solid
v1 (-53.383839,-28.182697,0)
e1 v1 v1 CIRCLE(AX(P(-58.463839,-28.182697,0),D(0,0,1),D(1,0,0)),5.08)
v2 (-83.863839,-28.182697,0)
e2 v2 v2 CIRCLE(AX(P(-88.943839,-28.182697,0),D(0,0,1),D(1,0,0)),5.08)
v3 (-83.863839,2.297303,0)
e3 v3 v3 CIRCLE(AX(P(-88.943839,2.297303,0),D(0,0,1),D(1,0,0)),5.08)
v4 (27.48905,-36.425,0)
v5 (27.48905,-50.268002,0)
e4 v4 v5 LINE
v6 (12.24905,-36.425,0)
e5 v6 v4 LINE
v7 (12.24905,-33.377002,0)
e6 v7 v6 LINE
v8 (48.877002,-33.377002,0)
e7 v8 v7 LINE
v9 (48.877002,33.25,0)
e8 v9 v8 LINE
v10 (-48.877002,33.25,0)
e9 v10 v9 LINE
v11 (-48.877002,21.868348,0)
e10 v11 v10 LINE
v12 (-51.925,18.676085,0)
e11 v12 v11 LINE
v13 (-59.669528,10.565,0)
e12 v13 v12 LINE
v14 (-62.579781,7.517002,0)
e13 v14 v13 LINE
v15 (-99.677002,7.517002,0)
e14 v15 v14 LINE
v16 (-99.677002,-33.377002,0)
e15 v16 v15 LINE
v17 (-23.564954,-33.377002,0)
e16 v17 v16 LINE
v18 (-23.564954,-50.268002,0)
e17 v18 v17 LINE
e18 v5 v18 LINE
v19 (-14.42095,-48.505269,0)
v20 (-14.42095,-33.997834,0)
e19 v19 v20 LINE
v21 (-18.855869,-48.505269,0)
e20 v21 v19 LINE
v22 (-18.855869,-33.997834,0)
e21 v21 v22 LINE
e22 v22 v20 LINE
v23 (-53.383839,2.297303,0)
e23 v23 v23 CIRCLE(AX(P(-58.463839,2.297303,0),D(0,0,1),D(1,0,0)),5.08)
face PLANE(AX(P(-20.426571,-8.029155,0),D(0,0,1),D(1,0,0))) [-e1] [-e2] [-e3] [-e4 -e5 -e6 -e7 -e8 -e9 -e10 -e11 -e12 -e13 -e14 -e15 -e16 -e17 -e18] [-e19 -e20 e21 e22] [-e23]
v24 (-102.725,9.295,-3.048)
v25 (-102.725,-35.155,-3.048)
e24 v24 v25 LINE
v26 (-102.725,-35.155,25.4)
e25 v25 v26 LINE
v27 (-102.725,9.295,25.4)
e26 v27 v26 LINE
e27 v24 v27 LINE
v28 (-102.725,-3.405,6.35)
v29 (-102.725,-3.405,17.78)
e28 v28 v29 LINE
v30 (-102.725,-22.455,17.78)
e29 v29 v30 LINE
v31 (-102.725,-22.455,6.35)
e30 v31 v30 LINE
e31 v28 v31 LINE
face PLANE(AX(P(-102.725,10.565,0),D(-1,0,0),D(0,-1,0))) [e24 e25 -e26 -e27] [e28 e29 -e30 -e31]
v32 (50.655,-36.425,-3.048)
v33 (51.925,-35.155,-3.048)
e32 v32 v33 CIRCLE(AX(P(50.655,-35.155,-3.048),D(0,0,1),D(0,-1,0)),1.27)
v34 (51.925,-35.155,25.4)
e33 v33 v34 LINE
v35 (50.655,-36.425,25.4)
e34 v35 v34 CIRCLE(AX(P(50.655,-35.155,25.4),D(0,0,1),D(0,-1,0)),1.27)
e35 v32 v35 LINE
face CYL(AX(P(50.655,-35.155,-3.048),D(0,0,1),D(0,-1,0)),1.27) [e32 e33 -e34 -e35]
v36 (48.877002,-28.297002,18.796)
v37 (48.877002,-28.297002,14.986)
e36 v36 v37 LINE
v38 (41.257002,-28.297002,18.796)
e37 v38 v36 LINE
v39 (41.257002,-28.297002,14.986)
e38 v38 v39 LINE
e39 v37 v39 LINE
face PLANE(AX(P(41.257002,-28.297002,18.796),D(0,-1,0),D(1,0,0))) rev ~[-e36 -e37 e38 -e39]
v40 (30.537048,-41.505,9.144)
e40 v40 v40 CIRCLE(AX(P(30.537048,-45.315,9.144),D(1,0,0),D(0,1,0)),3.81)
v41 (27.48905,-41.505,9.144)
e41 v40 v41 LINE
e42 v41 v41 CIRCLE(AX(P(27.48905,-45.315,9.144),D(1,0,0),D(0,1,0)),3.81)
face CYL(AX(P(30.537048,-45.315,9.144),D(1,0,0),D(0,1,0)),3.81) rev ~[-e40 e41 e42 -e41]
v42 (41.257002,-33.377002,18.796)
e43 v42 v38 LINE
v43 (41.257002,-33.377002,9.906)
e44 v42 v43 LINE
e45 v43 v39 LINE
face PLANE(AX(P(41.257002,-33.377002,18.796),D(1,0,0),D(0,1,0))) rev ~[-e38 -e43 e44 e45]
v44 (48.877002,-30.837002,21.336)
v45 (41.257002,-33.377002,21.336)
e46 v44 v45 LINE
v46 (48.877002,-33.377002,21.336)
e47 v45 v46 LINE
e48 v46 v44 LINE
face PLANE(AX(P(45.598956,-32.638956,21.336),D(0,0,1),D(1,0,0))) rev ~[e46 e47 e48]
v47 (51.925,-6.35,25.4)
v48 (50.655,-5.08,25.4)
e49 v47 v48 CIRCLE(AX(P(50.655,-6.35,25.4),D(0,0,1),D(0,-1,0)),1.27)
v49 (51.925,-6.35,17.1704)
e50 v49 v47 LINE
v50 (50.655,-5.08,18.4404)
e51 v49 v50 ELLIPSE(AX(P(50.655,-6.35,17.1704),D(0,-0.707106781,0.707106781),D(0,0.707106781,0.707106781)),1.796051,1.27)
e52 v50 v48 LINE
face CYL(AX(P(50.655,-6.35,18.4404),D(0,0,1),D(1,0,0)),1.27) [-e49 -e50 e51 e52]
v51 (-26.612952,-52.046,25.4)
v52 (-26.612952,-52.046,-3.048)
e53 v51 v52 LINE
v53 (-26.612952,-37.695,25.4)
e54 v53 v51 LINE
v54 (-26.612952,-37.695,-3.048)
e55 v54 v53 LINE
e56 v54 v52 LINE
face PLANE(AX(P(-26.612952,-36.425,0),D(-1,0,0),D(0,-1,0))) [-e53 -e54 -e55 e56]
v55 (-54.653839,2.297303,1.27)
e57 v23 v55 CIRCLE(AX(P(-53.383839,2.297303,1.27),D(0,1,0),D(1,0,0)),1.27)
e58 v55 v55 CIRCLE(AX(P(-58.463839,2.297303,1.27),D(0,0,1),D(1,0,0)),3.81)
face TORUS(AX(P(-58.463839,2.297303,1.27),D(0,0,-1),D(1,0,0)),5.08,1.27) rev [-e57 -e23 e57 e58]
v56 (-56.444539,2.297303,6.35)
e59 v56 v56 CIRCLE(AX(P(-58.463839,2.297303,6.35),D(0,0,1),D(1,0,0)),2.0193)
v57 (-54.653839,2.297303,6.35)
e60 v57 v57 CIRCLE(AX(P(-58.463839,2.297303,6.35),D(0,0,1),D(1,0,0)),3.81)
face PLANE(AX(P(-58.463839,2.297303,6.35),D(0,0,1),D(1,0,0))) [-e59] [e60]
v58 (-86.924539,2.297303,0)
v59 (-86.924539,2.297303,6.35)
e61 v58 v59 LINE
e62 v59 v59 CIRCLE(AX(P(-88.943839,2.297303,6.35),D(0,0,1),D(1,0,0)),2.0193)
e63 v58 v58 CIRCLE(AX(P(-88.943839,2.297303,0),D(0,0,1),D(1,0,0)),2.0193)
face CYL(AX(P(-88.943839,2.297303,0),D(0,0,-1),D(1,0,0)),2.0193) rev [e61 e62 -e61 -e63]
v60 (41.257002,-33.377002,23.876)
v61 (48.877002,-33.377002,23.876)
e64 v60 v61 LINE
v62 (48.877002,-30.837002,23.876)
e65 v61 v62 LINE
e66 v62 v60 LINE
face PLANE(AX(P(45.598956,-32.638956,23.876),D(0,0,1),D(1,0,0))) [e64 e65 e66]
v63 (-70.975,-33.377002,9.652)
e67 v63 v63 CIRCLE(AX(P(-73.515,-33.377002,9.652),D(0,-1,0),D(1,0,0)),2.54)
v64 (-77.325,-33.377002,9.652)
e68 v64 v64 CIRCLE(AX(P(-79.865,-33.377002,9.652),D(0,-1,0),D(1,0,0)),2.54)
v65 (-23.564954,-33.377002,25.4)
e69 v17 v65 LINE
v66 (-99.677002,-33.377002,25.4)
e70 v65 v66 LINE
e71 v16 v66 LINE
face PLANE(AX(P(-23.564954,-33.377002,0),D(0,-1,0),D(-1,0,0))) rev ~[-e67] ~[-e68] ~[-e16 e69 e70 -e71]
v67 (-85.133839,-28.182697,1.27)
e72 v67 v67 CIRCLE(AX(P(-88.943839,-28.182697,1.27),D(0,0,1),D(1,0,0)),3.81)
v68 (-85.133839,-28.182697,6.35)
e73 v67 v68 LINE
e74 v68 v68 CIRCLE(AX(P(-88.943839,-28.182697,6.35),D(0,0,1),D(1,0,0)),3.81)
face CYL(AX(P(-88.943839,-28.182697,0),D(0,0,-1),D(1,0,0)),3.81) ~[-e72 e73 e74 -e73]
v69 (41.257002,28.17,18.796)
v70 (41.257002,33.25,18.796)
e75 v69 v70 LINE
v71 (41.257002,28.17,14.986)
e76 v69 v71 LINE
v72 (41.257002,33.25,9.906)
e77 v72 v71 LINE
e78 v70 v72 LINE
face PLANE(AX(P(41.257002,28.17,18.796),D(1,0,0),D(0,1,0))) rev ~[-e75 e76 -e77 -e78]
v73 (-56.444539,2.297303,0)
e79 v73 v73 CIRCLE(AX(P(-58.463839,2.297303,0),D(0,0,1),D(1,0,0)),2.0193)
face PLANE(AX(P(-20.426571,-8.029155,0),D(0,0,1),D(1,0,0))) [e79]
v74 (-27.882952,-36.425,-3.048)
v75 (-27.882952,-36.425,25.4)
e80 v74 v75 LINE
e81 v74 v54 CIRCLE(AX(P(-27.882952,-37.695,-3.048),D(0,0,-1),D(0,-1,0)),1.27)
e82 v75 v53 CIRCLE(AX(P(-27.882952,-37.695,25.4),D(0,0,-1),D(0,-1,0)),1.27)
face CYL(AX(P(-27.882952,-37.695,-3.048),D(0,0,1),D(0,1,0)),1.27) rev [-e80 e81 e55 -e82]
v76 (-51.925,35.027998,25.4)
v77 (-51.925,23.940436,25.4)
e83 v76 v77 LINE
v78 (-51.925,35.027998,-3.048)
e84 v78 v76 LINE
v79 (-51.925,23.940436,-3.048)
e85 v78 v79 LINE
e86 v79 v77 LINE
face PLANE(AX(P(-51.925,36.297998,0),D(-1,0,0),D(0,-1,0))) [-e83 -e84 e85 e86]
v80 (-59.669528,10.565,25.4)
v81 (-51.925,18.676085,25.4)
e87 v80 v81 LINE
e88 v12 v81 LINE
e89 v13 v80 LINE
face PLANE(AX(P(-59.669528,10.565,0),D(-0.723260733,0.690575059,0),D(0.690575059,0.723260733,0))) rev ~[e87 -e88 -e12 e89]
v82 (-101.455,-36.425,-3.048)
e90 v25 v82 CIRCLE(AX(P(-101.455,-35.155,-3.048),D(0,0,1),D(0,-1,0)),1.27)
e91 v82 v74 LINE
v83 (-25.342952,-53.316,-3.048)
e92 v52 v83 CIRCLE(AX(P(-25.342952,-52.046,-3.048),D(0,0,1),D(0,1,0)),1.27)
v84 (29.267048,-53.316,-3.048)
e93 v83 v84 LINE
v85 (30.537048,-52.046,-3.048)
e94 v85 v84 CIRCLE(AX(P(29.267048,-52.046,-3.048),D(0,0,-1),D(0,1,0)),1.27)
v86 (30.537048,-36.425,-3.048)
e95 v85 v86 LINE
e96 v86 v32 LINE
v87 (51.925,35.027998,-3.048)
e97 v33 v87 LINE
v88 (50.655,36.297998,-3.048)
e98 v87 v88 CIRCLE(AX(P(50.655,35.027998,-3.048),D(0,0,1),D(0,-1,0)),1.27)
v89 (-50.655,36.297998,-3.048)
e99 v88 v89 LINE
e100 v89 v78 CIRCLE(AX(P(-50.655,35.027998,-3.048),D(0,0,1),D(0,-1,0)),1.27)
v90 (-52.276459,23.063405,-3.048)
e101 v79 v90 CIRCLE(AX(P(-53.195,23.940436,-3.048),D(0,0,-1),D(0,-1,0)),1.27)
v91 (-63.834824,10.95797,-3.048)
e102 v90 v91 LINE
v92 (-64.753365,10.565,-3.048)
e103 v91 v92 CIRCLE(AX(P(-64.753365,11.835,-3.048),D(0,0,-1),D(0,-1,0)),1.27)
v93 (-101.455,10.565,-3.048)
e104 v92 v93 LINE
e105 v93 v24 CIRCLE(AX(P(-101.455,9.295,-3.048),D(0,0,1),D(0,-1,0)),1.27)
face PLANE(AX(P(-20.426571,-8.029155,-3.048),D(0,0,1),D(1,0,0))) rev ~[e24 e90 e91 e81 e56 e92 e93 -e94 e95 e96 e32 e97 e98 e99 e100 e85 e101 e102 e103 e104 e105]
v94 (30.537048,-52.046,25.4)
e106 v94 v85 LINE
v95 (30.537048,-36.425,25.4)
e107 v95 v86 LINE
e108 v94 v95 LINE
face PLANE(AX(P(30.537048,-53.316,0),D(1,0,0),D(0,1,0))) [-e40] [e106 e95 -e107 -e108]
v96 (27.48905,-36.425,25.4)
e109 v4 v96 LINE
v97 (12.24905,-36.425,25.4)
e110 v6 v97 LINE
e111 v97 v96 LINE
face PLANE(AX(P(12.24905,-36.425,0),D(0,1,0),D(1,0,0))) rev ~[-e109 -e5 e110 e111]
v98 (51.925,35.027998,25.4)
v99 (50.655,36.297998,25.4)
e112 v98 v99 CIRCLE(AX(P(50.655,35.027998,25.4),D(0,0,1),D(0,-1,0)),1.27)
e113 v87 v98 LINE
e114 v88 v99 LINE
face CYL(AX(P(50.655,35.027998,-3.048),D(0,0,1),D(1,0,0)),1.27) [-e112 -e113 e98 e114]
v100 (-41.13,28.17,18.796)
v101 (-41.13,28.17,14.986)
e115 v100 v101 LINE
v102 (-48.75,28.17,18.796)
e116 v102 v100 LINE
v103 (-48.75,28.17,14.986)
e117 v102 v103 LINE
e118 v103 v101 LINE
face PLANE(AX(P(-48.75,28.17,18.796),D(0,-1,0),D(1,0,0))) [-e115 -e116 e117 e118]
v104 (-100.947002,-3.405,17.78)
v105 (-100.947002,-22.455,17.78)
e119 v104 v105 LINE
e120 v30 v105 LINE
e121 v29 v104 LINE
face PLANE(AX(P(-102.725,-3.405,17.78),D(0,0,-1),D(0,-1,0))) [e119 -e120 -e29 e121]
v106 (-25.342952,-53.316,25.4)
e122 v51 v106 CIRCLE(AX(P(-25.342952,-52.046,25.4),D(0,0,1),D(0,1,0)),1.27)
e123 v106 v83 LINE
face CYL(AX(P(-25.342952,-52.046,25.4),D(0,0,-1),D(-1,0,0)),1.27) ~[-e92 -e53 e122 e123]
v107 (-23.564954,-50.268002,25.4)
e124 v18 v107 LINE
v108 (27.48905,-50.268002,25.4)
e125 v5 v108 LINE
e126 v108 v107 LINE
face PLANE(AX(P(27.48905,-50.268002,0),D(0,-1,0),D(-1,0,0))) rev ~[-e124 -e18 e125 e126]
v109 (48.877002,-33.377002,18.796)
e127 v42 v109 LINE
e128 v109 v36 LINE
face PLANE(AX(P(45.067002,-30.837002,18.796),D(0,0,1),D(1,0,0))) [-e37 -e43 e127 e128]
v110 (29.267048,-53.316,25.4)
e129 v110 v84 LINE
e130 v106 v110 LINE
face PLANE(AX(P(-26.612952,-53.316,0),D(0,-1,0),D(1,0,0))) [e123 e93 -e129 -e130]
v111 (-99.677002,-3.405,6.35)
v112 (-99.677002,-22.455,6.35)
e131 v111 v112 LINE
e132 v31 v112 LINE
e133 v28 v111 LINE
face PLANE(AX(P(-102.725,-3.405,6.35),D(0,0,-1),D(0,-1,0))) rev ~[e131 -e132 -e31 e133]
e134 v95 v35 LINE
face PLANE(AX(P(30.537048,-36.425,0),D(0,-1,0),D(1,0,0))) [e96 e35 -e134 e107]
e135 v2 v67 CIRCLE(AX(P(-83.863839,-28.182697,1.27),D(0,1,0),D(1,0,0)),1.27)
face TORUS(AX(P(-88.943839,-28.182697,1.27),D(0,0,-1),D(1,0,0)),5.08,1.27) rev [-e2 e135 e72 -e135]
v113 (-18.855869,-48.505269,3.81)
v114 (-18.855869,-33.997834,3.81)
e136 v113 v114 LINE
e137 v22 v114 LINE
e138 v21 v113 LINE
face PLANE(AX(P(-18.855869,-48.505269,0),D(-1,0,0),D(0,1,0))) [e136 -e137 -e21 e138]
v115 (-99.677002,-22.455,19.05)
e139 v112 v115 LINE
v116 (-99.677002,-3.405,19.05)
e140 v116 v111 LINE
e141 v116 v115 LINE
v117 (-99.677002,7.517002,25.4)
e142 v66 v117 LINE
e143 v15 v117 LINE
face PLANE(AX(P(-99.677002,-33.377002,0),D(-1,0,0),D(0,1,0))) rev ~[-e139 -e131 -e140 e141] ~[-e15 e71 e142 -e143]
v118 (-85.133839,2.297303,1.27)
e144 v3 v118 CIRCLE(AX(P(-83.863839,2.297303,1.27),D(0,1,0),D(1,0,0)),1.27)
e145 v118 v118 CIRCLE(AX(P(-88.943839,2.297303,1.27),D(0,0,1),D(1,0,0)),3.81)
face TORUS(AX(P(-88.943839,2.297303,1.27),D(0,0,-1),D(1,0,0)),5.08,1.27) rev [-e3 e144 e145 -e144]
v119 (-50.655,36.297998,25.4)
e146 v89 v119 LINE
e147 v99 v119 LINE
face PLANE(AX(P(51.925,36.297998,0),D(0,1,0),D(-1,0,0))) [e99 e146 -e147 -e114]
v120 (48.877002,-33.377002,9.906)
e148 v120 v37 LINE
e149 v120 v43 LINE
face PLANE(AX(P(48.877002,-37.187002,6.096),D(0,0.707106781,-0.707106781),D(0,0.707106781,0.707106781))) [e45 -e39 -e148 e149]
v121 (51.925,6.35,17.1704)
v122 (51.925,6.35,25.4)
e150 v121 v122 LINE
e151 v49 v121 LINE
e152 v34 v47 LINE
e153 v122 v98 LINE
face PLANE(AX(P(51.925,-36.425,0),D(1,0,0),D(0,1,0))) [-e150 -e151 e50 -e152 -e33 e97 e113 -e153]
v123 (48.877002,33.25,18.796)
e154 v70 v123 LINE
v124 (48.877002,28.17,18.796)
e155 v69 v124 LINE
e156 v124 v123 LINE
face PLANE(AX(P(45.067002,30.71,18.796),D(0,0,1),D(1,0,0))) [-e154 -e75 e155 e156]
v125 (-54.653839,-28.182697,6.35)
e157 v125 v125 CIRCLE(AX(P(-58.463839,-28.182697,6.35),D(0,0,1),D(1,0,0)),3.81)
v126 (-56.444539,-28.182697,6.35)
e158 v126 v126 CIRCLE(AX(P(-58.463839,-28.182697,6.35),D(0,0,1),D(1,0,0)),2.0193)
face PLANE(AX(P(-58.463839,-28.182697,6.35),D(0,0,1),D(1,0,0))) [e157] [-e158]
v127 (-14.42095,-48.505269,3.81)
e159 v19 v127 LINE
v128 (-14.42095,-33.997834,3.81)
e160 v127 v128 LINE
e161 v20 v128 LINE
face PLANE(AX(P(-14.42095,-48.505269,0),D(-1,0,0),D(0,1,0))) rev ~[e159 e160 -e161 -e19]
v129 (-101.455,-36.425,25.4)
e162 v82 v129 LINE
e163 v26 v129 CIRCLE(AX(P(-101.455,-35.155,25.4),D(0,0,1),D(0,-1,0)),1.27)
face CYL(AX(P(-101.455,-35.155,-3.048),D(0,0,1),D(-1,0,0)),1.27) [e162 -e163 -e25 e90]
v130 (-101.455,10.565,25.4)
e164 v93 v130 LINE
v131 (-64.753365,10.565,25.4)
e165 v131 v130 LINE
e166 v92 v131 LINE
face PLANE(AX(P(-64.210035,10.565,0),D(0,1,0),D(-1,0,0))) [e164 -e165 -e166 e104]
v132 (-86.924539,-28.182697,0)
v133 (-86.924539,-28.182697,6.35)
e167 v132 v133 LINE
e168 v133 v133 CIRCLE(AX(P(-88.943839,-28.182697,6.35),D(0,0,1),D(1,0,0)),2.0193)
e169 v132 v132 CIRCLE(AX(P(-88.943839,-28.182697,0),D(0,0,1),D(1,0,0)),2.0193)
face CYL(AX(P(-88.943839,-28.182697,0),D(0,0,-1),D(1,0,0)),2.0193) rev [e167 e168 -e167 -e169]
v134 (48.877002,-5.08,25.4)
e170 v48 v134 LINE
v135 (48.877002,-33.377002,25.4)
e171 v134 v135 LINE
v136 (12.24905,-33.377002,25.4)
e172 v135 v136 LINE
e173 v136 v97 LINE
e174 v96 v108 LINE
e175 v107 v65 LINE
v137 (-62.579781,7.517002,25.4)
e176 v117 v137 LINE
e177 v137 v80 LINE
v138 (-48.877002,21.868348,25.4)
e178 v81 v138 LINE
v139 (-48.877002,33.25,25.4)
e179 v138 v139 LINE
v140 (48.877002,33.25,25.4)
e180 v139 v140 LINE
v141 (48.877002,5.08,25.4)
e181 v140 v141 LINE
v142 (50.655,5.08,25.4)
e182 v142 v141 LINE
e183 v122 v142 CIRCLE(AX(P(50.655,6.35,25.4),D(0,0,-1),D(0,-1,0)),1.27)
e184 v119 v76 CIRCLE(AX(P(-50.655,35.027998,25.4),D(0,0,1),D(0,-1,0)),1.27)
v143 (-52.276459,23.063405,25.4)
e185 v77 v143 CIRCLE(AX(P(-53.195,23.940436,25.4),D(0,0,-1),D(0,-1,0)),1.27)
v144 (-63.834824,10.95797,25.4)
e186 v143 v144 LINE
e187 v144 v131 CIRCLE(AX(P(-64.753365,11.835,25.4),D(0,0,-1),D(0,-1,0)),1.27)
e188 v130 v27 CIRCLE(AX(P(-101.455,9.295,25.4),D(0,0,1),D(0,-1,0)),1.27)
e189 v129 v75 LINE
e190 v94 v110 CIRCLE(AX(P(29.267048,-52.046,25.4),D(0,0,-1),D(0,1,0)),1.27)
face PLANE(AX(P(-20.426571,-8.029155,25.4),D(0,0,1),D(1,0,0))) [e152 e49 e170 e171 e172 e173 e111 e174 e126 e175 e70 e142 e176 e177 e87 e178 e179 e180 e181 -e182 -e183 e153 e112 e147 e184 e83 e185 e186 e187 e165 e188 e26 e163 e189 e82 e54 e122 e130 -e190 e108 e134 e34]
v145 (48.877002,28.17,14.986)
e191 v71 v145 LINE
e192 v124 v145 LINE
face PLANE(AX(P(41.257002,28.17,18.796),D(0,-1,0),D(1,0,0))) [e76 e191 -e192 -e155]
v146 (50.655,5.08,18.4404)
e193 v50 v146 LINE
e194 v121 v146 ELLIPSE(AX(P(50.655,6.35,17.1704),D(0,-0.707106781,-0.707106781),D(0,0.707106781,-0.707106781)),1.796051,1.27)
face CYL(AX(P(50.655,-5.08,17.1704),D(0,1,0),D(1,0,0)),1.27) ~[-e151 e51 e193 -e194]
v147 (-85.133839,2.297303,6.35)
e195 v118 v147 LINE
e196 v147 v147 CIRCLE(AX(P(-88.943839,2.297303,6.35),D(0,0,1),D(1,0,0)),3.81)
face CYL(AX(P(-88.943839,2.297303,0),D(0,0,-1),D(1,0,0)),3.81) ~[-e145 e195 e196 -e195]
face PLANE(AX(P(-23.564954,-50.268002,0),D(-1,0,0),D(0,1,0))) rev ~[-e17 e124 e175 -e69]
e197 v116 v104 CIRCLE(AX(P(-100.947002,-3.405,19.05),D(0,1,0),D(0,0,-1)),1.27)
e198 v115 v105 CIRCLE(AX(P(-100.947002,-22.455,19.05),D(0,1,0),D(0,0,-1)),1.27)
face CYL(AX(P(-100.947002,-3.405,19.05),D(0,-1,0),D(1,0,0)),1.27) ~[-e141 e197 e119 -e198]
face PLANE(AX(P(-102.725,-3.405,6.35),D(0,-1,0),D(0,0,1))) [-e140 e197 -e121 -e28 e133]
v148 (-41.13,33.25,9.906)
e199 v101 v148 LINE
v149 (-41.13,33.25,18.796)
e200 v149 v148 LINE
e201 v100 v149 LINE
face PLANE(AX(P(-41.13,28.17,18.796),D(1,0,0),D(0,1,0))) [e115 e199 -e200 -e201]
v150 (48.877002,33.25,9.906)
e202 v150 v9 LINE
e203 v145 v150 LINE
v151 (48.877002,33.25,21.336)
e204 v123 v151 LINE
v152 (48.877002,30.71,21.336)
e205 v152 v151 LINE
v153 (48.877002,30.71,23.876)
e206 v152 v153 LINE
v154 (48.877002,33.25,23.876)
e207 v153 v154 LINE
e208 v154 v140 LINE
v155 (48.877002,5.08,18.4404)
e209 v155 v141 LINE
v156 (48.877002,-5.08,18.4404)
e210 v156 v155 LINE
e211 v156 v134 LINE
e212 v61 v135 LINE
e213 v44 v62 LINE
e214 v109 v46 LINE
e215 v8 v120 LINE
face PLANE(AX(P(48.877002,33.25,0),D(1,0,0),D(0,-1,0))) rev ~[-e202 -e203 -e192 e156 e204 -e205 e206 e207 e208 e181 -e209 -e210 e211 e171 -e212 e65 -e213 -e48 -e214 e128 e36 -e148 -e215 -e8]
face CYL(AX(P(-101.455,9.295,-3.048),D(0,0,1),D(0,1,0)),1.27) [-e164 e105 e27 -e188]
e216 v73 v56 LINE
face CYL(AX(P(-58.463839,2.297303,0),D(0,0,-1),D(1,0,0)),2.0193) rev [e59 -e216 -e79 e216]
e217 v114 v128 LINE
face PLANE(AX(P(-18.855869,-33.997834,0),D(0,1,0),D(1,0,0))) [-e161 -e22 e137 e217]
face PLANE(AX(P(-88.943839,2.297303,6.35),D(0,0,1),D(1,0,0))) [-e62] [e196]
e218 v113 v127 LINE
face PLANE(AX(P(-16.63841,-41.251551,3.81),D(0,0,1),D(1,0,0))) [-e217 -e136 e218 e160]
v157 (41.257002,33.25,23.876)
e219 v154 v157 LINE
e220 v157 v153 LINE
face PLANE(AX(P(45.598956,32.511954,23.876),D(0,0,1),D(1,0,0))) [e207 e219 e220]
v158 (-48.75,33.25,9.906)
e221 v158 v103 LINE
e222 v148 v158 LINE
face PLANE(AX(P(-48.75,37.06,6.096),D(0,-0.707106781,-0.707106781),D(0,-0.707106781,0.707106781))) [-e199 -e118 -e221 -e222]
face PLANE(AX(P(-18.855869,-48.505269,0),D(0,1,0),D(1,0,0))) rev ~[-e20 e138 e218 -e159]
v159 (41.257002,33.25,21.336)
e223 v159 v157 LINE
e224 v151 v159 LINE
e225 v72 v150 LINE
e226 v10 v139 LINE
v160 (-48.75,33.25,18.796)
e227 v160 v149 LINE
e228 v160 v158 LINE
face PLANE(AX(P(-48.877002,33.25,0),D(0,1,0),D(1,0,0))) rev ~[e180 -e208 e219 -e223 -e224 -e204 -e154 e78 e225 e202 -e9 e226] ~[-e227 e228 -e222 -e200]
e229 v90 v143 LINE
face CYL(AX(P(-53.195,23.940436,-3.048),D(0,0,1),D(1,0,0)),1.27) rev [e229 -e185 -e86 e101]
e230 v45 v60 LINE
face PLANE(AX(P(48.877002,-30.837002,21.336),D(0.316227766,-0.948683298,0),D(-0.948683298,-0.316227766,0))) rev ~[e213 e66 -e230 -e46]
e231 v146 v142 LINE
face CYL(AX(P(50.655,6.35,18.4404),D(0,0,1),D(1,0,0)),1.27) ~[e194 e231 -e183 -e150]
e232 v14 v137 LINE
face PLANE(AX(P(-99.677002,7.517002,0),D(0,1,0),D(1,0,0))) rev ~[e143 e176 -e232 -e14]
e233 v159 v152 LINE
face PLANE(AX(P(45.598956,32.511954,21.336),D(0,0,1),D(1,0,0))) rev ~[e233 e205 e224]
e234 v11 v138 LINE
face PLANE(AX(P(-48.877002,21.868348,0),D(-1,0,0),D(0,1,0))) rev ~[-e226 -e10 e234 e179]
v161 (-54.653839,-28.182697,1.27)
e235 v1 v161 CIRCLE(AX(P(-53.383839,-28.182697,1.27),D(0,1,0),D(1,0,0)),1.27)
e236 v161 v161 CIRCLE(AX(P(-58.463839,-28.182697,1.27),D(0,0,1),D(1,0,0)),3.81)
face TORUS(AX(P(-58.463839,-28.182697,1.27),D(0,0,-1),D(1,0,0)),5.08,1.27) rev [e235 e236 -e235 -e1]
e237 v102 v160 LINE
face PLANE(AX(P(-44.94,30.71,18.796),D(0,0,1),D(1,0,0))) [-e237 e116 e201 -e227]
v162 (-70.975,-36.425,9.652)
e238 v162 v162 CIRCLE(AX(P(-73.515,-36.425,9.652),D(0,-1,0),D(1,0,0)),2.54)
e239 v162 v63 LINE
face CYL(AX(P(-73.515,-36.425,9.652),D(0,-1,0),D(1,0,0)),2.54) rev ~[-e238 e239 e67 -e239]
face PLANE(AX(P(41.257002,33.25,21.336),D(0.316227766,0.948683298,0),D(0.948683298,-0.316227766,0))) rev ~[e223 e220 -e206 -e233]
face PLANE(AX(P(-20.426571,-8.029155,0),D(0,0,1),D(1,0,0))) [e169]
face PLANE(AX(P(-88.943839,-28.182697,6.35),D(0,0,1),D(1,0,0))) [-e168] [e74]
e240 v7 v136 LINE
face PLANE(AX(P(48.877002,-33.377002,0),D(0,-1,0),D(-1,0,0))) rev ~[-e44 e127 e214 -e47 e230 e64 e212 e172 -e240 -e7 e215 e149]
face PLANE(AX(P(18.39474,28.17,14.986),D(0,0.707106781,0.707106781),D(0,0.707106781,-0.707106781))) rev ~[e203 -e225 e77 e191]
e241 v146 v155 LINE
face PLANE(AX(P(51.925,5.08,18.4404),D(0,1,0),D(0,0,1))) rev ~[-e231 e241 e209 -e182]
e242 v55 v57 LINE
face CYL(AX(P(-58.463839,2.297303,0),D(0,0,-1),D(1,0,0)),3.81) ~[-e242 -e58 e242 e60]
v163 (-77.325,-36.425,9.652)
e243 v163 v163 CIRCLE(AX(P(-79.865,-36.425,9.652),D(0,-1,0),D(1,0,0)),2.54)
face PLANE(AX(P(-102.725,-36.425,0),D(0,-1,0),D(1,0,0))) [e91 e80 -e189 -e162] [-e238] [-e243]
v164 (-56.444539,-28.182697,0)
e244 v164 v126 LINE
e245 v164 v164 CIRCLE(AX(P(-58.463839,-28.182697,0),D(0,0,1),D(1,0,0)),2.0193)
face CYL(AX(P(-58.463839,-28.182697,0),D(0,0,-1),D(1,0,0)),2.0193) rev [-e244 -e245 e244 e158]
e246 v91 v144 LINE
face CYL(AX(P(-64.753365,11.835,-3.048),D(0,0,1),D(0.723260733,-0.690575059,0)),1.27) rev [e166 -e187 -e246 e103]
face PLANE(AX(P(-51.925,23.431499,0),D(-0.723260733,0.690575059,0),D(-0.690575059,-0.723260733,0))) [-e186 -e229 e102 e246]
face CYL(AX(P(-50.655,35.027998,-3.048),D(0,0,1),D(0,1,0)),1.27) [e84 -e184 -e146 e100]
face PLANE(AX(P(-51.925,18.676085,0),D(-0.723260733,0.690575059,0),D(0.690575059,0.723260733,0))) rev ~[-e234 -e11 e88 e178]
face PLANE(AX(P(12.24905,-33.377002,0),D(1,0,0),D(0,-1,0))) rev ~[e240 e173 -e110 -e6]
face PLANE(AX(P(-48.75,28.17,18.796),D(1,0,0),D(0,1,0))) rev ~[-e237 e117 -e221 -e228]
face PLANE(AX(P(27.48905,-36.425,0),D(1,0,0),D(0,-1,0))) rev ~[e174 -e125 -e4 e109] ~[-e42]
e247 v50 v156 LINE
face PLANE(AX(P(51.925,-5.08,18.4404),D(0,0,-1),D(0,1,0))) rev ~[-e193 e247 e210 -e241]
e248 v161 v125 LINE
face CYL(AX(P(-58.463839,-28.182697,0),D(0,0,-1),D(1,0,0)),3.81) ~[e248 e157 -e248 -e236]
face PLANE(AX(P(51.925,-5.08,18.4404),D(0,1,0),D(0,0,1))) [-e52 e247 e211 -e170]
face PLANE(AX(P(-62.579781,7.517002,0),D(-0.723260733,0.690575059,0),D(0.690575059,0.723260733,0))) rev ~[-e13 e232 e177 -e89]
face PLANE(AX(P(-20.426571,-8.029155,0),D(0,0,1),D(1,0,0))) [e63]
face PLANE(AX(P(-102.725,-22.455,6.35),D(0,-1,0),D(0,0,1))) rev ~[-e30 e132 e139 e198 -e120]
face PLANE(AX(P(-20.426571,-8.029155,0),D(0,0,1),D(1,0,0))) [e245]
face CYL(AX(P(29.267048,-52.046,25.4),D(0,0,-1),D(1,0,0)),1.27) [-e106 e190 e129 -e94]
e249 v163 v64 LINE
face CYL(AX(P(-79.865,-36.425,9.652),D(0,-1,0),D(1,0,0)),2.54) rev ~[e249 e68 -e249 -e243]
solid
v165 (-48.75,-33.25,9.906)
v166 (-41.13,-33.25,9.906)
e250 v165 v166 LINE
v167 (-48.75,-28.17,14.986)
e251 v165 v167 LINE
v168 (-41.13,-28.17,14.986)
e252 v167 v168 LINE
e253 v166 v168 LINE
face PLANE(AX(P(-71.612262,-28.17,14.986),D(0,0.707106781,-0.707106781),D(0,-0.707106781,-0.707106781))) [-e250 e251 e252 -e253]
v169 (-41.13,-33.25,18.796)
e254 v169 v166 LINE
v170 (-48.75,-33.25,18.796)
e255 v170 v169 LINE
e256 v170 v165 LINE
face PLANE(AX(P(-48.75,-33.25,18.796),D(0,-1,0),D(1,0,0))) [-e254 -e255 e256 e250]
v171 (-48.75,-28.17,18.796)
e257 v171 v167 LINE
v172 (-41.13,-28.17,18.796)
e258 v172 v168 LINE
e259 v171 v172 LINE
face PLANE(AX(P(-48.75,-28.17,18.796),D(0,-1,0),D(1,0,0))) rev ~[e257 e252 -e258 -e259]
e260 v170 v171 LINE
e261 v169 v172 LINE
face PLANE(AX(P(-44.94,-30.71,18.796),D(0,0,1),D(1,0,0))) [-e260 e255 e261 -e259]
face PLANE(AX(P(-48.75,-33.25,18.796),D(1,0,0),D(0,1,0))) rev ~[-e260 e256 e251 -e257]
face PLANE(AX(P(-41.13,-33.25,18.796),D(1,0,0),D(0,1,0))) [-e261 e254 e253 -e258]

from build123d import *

# Parameters (mm, degrees)
F1_DEPTH       = 25.4
F0_R           = 3.81
F0_W           = 7.62
F0_H           = 5.08
F0_R_2         = 2.0193
F2_DEPTH       = 3.048
F3_DEPTH       = 6.35
F4_R           = 3.81
F5_DEPTH       = 6.35
F6_W           = 4.4349184911
F6_H           = 14.5074356901
F7_DEPTH       = 3.81
F8_W           = 19.05
F8_H           = 11.43
F9_DEPTH       = 5.08
F10_W          = 10.16
F10_H          = 7.112
F11_DEPTH      = 3.175
F13_W          = 7.62
F13_H          = 5.08
F14_DEPTH      = 12.7
F15_T4_DEPTH   = 30.482261763
F15_T9_DEPTH   = 30.482261763
F15_T14_DEPTH  = 30.482261763
F15_2_T1_DEPTH = 53.344523526
F18_DEPTH      = 2.54
F19_R          = 2.54
F20_DEPTH      = 3.048
F21_R          = 1.27


# Not quite as in the source:
# - a fillet or chamfer that OpenCascade refuses, or shapes differently, is made with other operations: its cross-section is extruded or revolved along the edge and cut away or added


with BuildPart() as f1:
    # F0 (on Top) → F1 (new body)
    with BuildSketch(Plane.XY):
        Polygon((30.5370476484, -36.425), (51.925, -36.425), (51.925, 36.2979981456), (-51.925, 36.2979981456), (-51.925, 23.4314990728), (-64.2100349069, 10.565), (-102.725, 10.565), (-102.725, -36.425), (-51.925, -36.425), (-26.6129523516, -36.425), (-26.6129523516, -53.316), (30.5370476484, -53.316), align=None)
        Polygon((-62.5797808525, 7.5170018544), (-59.6695281565, 10.565), (-51.925, 18.6760851618), (-48.8770018544, 21.8683484), (-48.8770018544, 33.25), (-48.75, 33.25), (-41.13, 33.25), (41.2570018544, 33.25), (48.8770018544, 33.25), (48.8770018544, 28.17), (48.8770018544, -28.2970018544), (48.8770018544, -33.3770018544), (41.2570018544, -33.3770018544), (27.4890495028, -33.3770018544), (12.2490495028, -33.3770018544), (12.2490495028, -36.425), (27.4890495028, -36.425), (27.4890495028, -50.2680018544), (-23.564954206, -50.2680018544), (-23.564954206, -33.3770018544), (-51.925, -33.3770018544), (-99.6770018544, -33.3770018544), (-99.6770018544, 7.5170018544), align=None, mode=Mode.SUBTRACT)
    extrude(amount=F1_DEPTH)

    # F0 (on Top) → F2 (join)
    with BuildSketch(Plane.XY):
        Polygon((30.5370476484, -36.425), (51.925, -36.425), (51.925, 36.2979981456), (-51.925, 36.2979981456), (-51.925, 23.4314990728), (-64.2100349069, 10.565), (-102.725, 10.565), (-102.725, -36.425), (-51.925, -36.425), (-26.6129523516, -36.425), (-26.6129523516, -53.316), (30.5370476484, -53.316), align=None)
        Polygon((-62.5797808525, 7.5170018544), (-59.6695281565, 10.565), (-51.925, 18.6760851618), (-48.8770018544, 21.8683484), (-48.8770018544, 33.25), (-48.75, 33.25), (-41.13, 33.25), (41.2570018544, 33.25), (48.8770018544, 33.25), (48.8770018544, 28.17), (48.8770018544, -28.2970018544), (48.8770018544, -33.3770018544), (41.2570018544, -33.3770018544), (27.4890495028, -33.3770018544), (12.2490495028, -33.3770018544), (12.2490495028, -36.425), (27.4890495028, -36.425), (27.4890495028, -50.2680018544), (-23.564954206, -50.2680018544), (-23.564954206, -33.3770018544), (-51.925, -33.3770018544), (-99.6770018544, -33.3770018544), (-99.6770018544, 7.5170018544), align=None, mode=Mode.SUBTRACT)
        Polygon((-51.925, 18.6760851618), (-59.6695281565, 10.565), (-62.5797808525, 7.5170018544), (-99.6770018544, 7.5170018544), (-99.6770018544, -33.3770018544), (-51.925, -33.3770018544), (-23.564954206, -33.3770018544), (-23.564954206, -50.2680018544), (27.4890495028, -50.2680018544), (27.4890495028, -36.425), (12.2490495028, -36.425), (12.2490495028, -33.3770018544), (27.4890495028, -33.3770018544), (41.2570018544, -33.3770018544), (41.2570018544, -28.2970018544), (48.8770018544, -28.2970018544), (48.8770018544, 28.17), (41.2570018544, 28.17), (41.2570018544, 33.25), (-41.13, 33.25), (-41.13, 28.17), (-48.75, 28.17), (-48.75, 33.25), (-48.8770018544, 33.25), (-48.8770018544, 21.8683484), align=None)
        with Locations((-88.9438392901, -28.1826965511)):
            Circle(F0_R, mode=Mode.SUBTRACT)
        with Locations((-58.4638392901, -28.1826965511)):
            Circle(F0_R, mode=Mode.SUBTRACT)
        with Locations((-44.94, -30.71)):
            Rectangle(F0_W, F0_H, mode=Mode.SUBTRACT)
        with Locations((-88.9438392901, 2.2973034489)):
            Circle(F0_R, mode=Mode.SUBTRACT)
        with Locations((-58.4638392901, 2.2973034489)):
            Circle(F0_R, mode=Mode.SUBTRACT)
        with Locations((-58.4638392901, 2.2973034489)):
            Circle(F0_R)
        with Locations((-58.4638392901, 2.2973034489)):
            Circle(F0_R_2, mode=Mode.SUBTRACT)
        with Locations((-88.9438392901, 2.2973034489)):
            Circle(F0_R)
        with Locations((-88.9438392901, 2.2973034489)):
            Circle(F0_R_2, mode=Mode.SUBTRACT)
        with Locations((-58.4638392901, -28.1826965511)):
            Circle(F0_R)
        with Locations((-58.4638392901, -28.1826965511)):
            Circle(F0_R_2, mode=Mode.SUBTRACT)
        with Locations((-88.9438392901, -28.1826965511)):
            Circle(F0_R)
        with Locations((-88.9438392901, -28.1826965511)):
            Circle(F0_R_2, mode=Mode.SUBTRACT)
        with Locations((-44.94, -30.71)):
            Rectangle(F0_W, F0_H)
        with Locations((45.0670018544, -30.8370018544)):
            Rectangle(F0_W, F0_H)
        with Locations((45.0670018544, 30.71)):
            Rectangle(F0_W, F0_H)
        with Locations((-44.94, 30.71)):
            Rectangle(F0_W, F0_H)
        with Locations((-88.9438392901, -28.1826965511)):
            Circle(F0_R_2)
        with Locations((-88.9438392901, 2.2973034489)):
            Circle(F0_R_2)
        with Locations((-58.4638392901, 2.2973034489)):
            Circle(F0_R_2)
        with Locations((-58.4638392901, -28.1826965511)):
            Circle(F0_R_2)
    extrude(amount=-F2_DEPTH)

    # F0 (on Top) → F3 (join)
    with BuildSketch(Plane.XY):
        with Locations((-58.4638392901, 2.2973034489)):
            Circle(F0_R)
        with Locations((-58.4638392901, 2.2973034489)):
            Circle(F0_R_2, mode=Mode.SUBTRACT)
        with Locations((-88.9438392901, 2.2973034489)):
            Circle(F0_R)
        with Locations((-88.9438392901, 2.2973034489)):
            Circle(F0_R_2, mode=Mode.SUBTRACT)
        with Locations((-88.9438392901, -28.1826965511)):
            Circle(F0_R)
        with Locations((-88.9438392901, -28.1826965511)):
            Circle(F0_R_2, mode=Mode.SUBTRACT)
        with Locations((-58.4638392901, -28.1826965511)):
            Circle(F0_R)
        with Locations((-58.4638392901, -28.1826965511)):
            Circle(F0_R_2, mode=Mode.SUBTRACT)
    extrude(amount=F3_DEPTH)

    # F4 (on face) → F5 (cut)
    with BuildSketch(Plane.YZ.offset(30.5370476484)):
        with Locations((-45.315, 9.144)):
            Circle(F4_R)
    extrude(amount=-F5_DEPTH, mode=Mode.SUBTRACT)

    # F6 (on face) → F7 (join)
    with BuildSketch(Plane.XY):
        with Locations((-16.6384097427, -41.2515513599)):
            Rectangle(F6_W, F6_H)
    extrude(amount=F7_DEPTH)

    # F8 (on face) → F9 (cut)
    with BuildSketch(Plane(origin=(-102.725, 0, 0), x_dir=(0, -1, 0), z_dir=(-1, 0, 0))):
        with Locations((12.93, 12.065)):
            Rectangle(F8_W, F8_H)
    extrude(amount=-F9_DEPTH, mode=Mode.SUBTRACT)

    # F10 (on face) → F11 (cut)
    with BuildSketch(Plane.YZ.offset(51.925)):
        with Locations((0, 21.9964)):
            Rectangle(F10_W, F10_H)
    extrude(amount=-F11_DEPTH, mode=Mode.SUBTRACT)

    # F13 (on offset) → F14, piece 2 (join)
    with BuildSketch(Plane.XY.offset(18.796)):
        with Locations((45.0670018544, -30.8370018544)):
            Rectangle(F13_W, F13_H)
        with Locations((-44.94, 30.71)):
            Rectangle(F13_W, F13_H)
        with Locations((45.0670018544, 30.71)):
            Rectangle(F13_W, F13_H)
    extrude(amount=-F14_DEPTH)

    # F15: chamfer of 8.89 on 3 edges, made by hand


with BuildPart() as f14:
    # F13 (on offset) → F14 (new body)
    with BuildSketch(Plane.XY.offset(18.796)):
        with Locations((-44.94, -30.71)):
            Rectangle(F13_W, F13_H)
    extrude(amount=-F14_DEPTH)

    # F15#2: chamfer of 8.89 on 1 edges, made by hand

    # F15_2_s2 → F15_2_t1 (cut)
    with BuildSketch(Plane.YZ.offset(-71.612261763)):
        Polygon((-28.17, 14.986), (-37.06, 6.096), (-28.17, 6.096), align=None)
    extrude(amount=F15_2_T1_DEPTH, mode=Mode.SUBTRACT)


with BuildPart() as f15_tool2:
    # F15_s3 → F15_t4 (new body)
    with BuildSketch(Plane.YZ.offset(-48.75)):
        Polygon((37.06, 6.096), (28.17, 14.986), (28.17, 6.096), align=None)
    extrude(amount=F15_T4_DEPTH)

    split(bisect_by=Plane.XZ.offset(-33.25), keep=Keep.TOP)


with BuildPart() as f1_1:
    add(f1.part)

    # F15_t1: cut F15_tool2
    add(f15_tool2.part, mode=Mode.SUBTRACT)


with BuildPart() as f15_tool7:
    # F15_s8 → F15_t9 (new body)
    with BuildSketch(Plane.YZ.offset(18.3947400914)):
        Polygon((28.17, 14.986), (37.06, 6.096), (28.17, 6.096), align=None)
    extrude(amount=F15_T9_DEPTH)

    split(bisect_by=Plane.XZ.offset(-33.25), keep=Keep.TOP)


with BuildPart() as f1_2:
    add(f1_1.part)

    # F15_t6: cut F15_tool7
    add(f15_tool7.part, mode=Mode.SUBTRACT)


with BuildPart() as f15_tool12:
    # F15_s13 → F15_t14 (new body)
    with BuildSketch(Plane.YZ.offset(48.8770018544)):
        Polygon((-37.1870018544, 6.096), (-28.2970018544, 14.986), (-28.2970018544, 6.096), align=None)
    extrude(amount=-F15_T14_DEPTH)

    split(bisect_by=Plane.XZ.offset(33.3770018544), keep=Keep.BOTTOM)


with BuildPart() as f1_3:
    add(f1_2.part)

    # F15_t11: cut F15_tool12
    add(f15_tool12.part, mode=Mode.SUBTRACT)

    # F17 (on offset) → F18 (join)
    with BuildSketch(Plane.XY.offset(21.336)):
        Polygon((41.2570018544, -33.3770018544), (48.8770018544, -33.3770018544), (48.8770018544, -30.8370018544), align=None)
        Polygon((41.2570018544, 33.25), (48.8770018544, 30.71), (48.8770018544, 33.25), align=None)
    extrude(amount=F18_DEPTH)

    # F19 (on face) → F20 (cut)
    with BuildSketch(Plane.XZ.offset(36.425)):
        with Locations((-79.865, 9.652)):
            Circle(F19_R)
        with Locations((-73.515, 9.652)):
            Circle(F19_R)
    extrude(amount=-F20_DEPTH, mode=Mode.SUBTRACT)

    # F21
    f21_edges = [f1_3.edges().sort_by_distance(p)[0] for p in [
        (51.925, -36.425, 11.176),
        (30.537048, -53.316, 11.176),
        (-26.612952, -53.316, 11.176),
        (-26.612952, -36.425, 11.176),
        (-102.725, -36.425, 11.176),
        (-102.725, 10.565, 11.176),
        (-64.210035, 10.565, 11.176),
        (-51.925, 23.431499, 11.176),
        (-51.925, 36.297998, 11.176),
        (51.925, 36.297998, 11.176),
        (-62.273839, -28.182697, 0),
        (-92.753839, -28.182697, 0),
        (-62.273839, 2.297303, 0),
        (-92.753839, 2.297303, 0),
        (51.925, -5.08, 21.9202),
        (51.925, 0, 18.4404),
        (51.925, 5.08, 21.9202),
        (-99.677002, -12.93, 17.78),
    ]]
    fillet(f21_edges, radius=F21_R)


solid = Compound([f14.part, f1_3.part])
